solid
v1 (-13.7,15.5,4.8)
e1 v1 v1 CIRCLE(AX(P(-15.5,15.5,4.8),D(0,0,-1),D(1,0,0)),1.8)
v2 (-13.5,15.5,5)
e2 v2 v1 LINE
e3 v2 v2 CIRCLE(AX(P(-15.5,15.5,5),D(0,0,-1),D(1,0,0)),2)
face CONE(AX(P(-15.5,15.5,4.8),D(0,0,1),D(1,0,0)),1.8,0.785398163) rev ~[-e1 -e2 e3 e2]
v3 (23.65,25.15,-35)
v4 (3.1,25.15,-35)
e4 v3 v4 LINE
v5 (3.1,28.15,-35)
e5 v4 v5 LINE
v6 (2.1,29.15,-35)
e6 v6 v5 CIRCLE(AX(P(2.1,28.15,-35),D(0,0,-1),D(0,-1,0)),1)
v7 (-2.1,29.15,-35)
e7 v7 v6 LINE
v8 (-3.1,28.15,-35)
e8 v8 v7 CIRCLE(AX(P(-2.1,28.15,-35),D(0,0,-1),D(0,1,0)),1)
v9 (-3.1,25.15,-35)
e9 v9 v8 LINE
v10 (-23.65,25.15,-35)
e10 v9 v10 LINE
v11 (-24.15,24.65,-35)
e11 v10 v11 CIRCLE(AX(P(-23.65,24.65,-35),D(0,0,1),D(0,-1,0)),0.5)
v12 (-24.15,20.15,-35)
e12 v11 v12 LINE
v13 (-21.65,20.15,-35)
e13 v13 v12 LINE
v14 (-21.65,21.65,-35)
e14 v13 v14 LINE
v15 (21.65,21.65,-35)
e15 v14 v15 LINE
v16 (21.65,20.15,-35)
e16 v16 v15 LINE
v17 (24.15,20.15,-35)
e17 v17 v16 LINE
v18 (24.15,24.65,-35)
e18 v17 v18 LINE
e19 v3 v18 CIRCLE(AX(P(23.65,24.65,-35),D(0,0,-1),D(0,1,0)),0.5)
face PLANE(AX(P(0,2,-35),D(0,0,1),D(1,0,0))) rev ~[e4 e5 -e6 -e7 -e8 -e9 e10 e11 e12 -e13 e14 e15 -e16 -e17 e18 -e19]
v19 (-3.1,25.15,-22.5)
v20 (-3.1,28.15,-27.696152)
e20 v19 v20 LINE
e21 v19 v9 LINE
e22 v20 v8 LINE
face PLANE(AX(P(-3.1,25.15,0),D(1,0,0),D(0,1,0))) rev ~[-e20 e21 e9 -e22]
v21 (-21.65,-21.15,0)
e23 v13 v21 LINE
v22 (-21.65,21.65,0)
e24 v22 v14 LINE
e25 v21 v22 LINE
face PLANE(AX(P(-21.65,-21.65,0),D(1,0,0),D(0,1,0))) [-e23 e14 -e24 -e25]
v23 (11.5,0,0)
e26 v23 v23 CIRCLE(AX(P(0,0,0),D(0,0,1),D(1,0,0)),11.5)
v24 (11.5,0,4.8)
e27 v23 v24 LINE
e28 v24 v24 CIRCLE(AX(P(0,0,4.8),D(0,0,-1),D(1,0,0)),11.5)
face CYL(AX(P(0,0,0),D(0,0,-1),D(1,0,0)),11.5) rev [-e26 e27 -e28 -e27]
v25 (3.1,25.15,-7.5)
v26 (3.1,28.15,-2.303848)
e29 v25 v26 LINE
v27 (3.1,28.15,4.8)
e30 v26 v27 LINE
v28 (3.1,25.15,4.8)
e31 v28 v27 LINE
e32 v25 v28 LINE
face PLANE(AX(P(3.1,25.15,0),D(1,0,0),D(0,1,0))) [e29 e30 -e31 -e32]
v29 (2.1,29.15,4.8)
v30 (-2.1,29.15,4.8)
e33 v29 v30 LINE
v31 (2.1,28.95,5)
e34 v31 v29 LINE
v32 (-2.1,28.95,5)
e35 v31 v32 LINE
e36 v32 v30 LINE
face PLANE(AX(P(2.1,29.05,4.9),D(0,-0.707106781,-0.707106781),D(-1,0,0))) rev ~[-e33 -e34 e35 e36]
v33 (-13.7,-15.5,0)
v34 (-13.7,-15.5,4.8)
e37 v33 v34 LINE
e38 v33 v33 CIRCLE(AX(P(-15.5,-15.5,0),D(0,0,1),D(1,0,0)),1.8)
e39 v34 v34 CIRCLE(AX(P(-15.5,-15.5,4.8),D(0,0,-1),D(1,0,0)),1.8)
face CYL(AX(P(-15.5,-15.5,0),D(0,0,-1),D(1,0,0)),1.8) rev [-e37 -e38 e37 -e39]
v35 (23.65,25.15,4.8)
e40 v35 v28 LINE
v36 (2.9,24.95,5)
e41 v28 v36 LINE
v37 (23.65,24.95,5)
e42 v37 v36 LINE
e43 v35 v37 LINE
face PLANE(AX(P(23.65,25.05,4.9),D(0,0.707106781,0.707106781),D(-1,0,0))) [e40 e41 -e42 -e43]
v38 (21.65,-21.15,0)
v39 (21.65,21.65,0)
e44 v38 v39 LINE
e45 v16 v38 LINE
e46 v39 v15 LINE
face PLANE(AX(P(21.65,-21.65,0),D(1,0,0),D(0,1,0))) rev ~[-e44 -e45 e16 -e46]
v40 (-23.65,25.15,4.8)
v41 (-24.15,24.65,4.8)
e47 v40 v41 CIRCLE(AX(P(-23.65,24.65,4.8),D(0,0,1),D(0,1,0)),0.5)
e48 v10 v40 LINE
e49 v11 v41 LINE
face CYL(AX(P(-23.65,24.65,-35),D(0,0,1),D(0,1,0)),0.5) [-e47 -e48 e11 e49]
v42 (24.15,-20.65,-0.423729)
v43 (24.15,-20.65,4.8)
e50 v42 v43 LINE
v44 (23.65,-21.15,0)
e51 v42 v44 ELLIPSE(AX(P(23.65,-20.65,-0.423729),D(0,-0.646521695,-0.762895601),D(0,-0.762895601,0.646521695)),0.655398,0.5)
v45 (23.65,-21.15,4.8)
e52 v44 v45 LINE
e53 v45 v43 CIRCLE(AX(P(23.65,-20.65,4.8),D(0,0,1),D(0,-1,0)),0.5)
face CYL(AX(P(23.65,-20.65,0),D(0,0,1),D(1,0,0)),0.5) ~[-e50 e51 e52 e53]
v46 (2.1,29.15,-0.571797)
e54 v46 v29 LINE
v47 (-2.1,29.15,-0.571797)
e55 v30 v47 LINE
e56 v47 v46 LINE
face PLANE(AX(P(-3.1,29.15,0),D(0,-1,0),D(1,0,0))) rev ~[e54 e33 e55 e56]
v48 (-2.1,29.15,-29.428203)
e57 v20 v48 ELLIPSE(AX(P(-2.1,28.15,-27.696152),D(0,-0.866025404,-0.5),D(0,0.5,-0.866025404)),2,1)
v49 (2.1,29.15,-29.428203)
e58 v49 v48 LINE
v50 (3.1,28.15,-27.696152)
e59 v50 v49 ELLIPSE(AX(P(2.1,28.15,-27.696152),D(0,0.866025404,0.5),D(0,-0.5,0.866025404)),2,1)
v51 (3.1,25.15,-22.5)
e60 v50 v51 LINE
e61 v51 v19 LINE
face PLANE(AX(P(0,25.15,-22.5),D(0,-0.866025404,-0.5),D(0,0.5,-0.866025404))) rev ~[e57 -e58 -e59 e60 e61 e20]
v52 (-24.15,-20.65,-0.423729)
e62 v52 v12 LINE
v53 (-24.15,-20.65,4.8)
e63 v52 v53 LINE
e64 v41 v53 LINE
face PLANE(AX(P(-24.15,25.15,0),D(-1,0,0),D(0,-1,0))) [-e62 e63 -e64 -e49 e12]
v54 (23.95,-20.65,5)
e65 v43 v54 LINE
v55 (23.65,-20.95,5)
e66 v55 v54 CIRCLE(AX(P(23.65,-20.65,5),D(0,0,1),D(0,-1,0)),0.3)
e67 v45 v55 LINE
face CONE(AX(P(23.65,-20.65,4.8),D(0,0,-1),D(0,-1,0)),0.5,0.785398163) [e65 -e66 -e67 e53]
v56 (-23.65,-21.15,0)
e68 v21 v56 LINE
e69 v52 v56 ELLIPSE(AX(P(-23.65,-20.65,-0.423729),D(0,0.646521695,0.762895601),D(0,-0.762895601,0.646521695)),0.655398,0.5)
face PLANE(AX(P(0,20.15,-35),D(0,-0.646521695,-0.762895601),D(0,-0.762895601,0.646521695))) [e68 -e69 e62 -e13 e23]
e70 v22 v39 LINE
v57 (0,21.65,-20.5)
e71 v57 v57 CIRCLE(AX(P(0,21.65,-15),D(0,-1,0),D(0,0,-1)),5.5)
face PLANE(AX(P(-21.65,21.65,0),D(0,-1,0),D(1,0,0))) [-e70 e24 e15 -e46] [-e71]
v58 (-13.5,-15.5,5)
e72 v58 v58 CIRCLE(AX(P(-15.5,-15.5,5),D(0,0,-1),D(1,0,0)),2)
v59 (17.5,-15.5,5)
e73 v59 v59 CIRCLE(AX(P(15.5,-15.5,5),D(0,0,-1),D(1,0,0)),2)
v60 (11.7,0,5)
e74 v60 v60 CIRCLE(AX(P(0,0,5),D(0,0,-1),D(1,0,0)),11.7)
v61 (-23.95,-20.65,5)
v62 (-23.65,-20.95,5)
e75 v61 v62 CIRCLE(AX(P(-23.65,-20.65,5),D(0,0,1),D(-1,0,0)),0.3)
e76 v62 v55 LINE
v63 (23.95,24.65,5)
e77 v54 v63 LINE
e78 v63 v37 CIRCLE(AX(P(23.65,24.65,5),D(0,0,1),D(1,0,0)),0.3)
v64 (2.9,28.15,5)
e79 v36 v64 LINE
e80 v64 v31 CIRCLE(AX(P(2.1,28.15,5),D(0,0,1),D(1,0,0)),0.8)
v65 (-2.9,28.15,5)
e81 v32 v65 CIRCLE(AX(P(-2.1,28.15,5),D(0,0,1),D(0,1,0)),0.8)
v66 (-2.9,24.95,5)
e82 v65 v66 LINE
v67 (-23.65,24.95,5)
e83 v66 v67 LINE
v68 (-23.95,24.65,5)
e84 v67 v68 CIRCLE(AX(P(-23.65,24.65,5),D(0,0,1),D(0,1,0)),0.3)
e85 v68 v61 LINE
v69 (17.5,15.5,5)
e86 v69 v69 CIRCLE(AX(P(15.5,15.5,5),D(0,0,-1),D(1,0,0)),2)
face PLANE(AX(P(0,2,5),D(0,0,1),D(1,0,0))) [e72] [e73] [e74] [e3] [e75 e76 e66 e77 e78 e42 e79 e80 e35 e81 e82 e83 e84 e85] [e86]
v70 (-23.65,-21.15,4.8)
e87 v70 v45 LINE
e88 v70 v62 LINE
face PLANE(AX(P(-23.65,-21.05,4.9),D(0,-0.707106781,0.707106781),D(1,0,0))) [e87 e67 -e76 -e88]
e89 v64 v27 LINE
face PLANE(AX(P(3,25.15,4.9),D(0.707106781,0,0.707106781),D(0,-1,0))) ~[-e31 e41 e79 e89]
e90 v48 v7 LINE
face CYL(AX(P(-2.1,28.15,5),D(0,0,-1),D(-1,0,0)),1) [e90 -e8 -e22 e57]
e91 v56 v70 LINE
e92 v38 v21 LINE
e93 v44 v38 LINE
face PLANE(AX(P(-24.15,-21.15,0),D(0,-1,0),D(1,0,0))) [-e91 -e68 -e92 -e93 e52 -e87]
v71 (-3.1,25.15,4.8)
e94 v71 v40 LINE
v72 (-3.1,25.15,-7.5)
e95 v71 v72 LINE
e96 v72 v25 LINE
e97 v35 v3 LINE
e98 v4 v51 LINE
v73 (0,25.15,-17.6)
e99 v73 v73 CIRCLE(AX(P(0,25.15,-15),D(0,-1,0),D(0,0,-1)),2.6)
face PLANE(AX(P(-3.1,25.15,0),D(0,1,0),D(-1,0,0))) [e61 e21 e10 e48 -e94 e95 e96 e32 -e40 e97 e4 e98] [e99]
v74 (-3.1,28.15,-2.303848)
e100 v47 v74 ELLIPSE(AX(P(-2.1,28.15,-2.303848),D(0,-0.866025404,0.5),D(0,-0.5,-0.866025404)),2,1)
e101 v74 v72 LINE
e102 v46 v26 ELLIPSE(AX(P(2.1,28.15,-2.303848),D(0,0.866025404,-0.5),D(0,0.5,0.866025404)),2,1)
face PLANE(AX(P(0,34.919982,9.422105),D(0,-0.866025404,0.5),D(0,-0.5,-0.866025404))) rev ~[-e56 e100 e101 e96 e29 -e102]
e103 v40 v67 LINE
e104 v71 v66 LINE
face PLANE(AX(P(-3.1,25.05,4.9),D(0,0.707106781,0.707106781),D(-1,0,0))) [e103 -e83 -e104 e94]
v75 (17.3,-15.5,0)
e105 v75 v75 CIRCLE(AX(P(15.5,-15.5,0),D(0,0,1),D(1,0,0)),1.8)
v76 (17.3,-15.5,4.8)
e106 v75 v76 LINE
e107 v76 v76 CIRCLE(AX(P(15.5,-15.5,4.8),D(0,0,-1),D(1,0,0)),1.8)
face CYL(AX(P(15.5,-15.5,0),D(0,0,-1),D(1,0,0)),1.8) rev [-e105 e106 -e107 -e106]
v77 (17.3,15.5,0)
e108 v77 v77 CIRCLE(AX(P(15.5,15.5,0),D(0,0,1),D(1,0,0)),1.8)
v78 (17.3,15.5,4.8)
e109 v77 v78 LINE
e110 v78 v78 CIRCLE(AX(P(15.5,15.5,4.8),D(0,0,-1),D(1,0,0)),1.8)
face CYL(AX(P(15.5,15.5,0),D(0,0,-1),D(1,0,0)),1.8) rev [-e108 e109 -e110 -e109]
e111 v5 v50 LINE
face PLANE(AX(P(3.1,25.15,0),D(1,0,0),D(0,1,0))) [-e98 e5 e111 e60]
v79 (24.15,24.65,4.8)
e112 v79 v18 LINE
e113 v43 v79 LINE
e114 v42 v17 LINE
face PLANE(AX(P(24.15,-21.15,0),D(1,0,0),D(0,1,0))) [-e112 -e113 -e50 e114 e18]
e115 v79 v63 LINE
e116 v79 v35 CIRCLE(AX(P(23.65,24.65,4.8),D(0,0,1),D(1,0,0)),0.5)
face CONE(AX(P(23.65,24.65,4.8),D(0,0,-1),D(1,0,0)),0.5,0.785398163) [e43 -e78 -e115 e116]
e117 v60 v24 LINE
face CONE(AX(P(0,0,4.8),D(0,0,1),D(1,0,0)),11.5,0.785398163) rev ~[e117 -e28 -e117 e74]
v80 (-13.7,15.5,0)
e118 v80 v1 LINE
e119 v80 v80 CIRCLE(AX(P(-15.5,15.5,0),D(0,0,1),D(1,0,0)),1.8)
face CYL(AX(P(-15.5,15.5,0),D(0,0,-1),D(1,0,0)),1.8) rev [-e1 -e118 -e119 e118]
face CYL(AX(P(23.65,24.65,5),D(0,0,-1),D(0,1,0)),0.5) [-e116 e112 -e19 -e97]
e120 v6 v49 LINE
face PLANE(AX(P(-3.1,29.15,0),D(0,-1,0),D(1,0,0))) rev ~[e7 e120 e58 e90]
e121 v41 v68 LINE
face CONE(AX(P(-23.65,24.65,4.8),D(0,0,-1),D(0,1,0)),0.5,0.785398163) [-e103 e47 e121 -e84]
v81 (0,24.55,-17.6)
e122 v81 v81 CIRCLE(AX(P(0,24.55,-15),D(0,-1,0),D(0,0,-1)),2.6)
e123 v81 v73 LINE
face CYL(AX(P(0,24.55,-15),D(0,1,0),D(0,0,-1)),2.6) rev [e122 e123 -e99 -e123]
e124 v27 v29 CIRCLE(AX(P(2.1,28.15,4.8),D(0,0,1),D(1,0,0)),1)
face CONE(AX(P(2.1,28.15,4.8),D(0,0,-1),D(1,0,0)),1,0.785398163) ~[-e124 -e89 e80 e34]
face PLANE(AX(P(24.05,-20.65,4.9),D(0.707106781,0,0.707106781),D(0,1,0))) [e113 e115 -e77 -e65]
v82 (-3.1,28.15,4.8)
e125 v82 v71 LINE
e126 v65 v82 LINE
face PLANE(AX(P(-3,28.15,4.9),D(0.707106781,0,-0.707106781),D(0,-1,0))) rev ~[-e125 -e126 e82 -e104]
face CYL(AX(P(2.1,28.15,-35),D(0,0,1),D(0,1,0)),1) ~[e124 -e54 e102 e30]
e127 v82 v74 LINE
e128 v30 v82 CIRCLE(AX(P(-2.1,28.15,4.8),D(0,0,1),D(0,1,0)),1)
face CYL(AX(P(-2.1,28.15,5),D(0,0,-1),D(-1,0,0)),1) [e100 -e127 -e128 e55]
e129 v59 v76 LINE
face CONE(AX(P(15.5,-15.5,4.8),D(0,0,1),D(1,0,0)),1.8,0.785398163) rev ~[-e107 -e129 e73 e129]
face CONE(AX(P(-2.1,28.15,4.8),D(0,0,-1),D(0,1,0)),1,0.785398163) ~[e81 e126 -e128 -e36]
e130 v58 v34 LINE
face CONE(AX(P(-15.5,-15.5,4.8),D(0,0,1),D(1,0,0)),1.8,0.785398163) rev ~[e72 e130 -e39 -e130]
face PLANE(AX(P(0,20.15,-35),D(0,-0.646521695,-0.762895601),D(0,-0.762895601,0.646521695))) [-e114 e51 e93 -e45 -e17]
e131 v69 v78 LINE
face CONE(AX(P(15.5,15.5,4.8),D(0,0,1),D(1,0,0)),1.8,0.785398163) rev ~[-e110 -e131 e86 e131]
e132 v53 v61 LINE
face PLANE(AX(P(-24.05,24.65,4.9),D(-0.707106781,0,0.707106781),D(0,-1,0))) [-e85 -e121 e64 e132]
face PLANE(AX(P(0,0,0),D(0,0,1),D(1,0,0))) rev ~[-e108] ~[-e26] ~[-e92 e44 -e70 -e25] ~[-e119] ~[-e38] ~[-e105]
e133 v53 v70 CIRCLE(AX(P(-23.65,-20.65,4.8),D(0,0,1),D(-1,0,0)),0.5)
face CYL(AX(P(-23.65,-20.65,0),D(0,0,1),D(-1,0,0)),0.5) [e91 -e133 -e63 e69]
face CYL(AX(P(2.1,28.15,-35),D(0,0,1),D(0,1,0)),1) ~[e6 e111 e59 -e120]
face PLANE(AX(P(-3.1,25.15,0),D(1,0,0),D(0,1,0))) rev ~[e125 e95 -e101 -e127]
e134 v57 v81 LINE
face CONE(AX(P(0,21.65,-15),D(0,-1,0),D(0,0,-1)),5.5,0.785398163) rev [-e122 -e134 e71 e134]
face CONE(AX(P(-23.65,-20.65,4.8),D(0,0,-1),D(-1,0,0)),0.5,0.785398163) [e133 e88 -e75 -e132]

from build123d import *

# Parameters (mm, degrees)
F1_W          = 6.2
F1_H          = 4
F2_DEPTH      = 5
F2_DEPTH_BACK = 35
F3_R          = 1
F5_DEPTH      = 24.151
F5_DEPTH_BACK = 24.151
F6_W          = 43.3
F6_H          = 43.3
F6_R          = 1.8
F6_R_2        = 11.5
F7_DEPTH      = 35.001
F8_DEPTH      = 5.001
F12_R         = 0.5
F13_SIZE      = 0.2


# Not quite as in the source:
# - a feature of the source that left no trace in its solid (it failed there, or was rolled back) is left out


with BuildPart() as f2:
    # F1 (on Top) → F2 (new body, two sides)
    with BuildSketch(Plane.XY) as f2_sk:
        Polygon((-24.15, 25.15), (-24.15, -21.15), (24.15, -21.15), (24.15, 25.15), (3.1, 25.15), (-3.1, 25.15), align=None)
        with Locations((0, 27.15)):
            Rectangle(F1_W, F1_H)
    extrude(amount=F2_DEPTH)
    extrude(f2_sk.sketch, amount=-F2_DEPTH_BACK)

    # F3
    f3_edges = [f2.edges().sort_by_distance(p)[0] for p in [
        (-3.1, 29.15, -15),
        (3.1, 29.15, -15),
    ]]
    fillet(f3_edges, radius=F3_R)

    # F4 (on Right) → F5 (cut, two sides)
    with BuildSketch(Plane.YZ) as f5_sk:
        Polygon((20.15, -35), (-21.15, 0), (-21.15, -35), align=None)
        Polygon((34.9199817246, 9.422104736), (25.15, -7.5), (25.15, -22.5), (34.9199817246, -39.422104736), align=None)
    extrude(amount=-F5_DEPTH, mode=Mode.SUBTRACT)
    extrude(f5_sk.sketch, amount=F5_DEPTH_BACK, mode=Mode.SUBTRACT)

    # F6 (on Top) → F7 (cut, through all)
    with BuildSketch(Plane.XY):
        Rectangle(F6_W, F6_H)
        with Locations((-15.5, -15.5)):
            Circle(F6_R, mode=Mode.SUBTRACT)
        with Locations((15.5, -15.5)):
            Circle(F6_R, mode=Mode.SUBTRACT)
        with Locations((-15.5, 15.5)):
            Circle(F6_R, mode=Mode.SUBTRACT)
        Circle(F6_R_2, mode=Mode.SUBTRACT)
        with Locations((15.5, 15.5)):
            Circle(F6_R, mode=Mode.SUBTRACT)
        with Locations((-15.5, -15.5)):
            Circle(F6_R)
        with Locations((-15.5, 15.5)):
            Circle(F6_R)
        Circle(F6_R_2)
        with Locations((15.5, 15.5)):
            Circle(F6_R)
        with Locations((15.5, -15.5)):
            Circle(F6_R)
    extrude(amount=-F7_DEPTH, mode=Mode.SUBTRACT)

    # F6 (on Top) → F8 (cut, through all)
    with BuildSketch(Plane.XY):
        Circle(F6_R_2)
        with Locations((-15.5, -15.5)):
            Circle(F6_R)
        with Locations((15.5, -15.5)):
            Circle(F6_R)
        with Locations((15.5, 15.5)):
            Circle(F6_R)
        with Locations((-15.5, 15.5)):
            Circle(F6_R)
    extrude(amount=F8_DEPTH, mode=Mode.SUBTRACT)

    # F9 (on Right) → F10 (revolve, cut)
    with BuildSketch(Plane.YZ):
        Polygon((25.15, -17.6), (25.15, -15), (21.65, -15), (21.65, -20.5), (24.55, -17.6), align=None)
    revolve(axis=Axis((0, 23.4, -15), (0, -1, 0)), mode=Mode.SUBTRACT)

    # F12
    f12_edges = [f2.edges().sort_by_distance(p)[0] for p in [
        (24.15, 25.15, -15),
        (-24.15, 25.15, -15),
        (-24.15, -21.15, 2.5),
        (24.15, -21.15, 2.5),
    ]]
    fillet(f12_edges, radius=F12_R)

    # F13
    f13_edges = [f2.edges().sort_by_distance(p)[0] for p in [
        (13.375, 25.15, 5),
        (24.003553, 25.003553, 5),
        (3.1, 26.65, 5),
        (24.15, 2, 5),
        (2.807107, 28.857107, 5),
        (24.003553, -21.003553, 5),
        (0, 29.15, 5),
        (0, -21.15, 5),
        (-2.807107, 28.857107, 5),
        (-24.003553, -21.003553, 5),
        (-3.1, 26.65, 5),
        (-24.15, 2, 5),
        (-13.375, 25.15, 5),
        (-24.003553, 25.003553, 5),
        (-17.3, -15.5, 5),
        (13.7, -15.5, 5),
        (-11.5, 0, 5),
        (-17.3, 15.5, 5),
        (13.7, 15.5, 5),
    ]]
    chamfer(f13_edges, length=F13_SIZE)


solid = f2.part
